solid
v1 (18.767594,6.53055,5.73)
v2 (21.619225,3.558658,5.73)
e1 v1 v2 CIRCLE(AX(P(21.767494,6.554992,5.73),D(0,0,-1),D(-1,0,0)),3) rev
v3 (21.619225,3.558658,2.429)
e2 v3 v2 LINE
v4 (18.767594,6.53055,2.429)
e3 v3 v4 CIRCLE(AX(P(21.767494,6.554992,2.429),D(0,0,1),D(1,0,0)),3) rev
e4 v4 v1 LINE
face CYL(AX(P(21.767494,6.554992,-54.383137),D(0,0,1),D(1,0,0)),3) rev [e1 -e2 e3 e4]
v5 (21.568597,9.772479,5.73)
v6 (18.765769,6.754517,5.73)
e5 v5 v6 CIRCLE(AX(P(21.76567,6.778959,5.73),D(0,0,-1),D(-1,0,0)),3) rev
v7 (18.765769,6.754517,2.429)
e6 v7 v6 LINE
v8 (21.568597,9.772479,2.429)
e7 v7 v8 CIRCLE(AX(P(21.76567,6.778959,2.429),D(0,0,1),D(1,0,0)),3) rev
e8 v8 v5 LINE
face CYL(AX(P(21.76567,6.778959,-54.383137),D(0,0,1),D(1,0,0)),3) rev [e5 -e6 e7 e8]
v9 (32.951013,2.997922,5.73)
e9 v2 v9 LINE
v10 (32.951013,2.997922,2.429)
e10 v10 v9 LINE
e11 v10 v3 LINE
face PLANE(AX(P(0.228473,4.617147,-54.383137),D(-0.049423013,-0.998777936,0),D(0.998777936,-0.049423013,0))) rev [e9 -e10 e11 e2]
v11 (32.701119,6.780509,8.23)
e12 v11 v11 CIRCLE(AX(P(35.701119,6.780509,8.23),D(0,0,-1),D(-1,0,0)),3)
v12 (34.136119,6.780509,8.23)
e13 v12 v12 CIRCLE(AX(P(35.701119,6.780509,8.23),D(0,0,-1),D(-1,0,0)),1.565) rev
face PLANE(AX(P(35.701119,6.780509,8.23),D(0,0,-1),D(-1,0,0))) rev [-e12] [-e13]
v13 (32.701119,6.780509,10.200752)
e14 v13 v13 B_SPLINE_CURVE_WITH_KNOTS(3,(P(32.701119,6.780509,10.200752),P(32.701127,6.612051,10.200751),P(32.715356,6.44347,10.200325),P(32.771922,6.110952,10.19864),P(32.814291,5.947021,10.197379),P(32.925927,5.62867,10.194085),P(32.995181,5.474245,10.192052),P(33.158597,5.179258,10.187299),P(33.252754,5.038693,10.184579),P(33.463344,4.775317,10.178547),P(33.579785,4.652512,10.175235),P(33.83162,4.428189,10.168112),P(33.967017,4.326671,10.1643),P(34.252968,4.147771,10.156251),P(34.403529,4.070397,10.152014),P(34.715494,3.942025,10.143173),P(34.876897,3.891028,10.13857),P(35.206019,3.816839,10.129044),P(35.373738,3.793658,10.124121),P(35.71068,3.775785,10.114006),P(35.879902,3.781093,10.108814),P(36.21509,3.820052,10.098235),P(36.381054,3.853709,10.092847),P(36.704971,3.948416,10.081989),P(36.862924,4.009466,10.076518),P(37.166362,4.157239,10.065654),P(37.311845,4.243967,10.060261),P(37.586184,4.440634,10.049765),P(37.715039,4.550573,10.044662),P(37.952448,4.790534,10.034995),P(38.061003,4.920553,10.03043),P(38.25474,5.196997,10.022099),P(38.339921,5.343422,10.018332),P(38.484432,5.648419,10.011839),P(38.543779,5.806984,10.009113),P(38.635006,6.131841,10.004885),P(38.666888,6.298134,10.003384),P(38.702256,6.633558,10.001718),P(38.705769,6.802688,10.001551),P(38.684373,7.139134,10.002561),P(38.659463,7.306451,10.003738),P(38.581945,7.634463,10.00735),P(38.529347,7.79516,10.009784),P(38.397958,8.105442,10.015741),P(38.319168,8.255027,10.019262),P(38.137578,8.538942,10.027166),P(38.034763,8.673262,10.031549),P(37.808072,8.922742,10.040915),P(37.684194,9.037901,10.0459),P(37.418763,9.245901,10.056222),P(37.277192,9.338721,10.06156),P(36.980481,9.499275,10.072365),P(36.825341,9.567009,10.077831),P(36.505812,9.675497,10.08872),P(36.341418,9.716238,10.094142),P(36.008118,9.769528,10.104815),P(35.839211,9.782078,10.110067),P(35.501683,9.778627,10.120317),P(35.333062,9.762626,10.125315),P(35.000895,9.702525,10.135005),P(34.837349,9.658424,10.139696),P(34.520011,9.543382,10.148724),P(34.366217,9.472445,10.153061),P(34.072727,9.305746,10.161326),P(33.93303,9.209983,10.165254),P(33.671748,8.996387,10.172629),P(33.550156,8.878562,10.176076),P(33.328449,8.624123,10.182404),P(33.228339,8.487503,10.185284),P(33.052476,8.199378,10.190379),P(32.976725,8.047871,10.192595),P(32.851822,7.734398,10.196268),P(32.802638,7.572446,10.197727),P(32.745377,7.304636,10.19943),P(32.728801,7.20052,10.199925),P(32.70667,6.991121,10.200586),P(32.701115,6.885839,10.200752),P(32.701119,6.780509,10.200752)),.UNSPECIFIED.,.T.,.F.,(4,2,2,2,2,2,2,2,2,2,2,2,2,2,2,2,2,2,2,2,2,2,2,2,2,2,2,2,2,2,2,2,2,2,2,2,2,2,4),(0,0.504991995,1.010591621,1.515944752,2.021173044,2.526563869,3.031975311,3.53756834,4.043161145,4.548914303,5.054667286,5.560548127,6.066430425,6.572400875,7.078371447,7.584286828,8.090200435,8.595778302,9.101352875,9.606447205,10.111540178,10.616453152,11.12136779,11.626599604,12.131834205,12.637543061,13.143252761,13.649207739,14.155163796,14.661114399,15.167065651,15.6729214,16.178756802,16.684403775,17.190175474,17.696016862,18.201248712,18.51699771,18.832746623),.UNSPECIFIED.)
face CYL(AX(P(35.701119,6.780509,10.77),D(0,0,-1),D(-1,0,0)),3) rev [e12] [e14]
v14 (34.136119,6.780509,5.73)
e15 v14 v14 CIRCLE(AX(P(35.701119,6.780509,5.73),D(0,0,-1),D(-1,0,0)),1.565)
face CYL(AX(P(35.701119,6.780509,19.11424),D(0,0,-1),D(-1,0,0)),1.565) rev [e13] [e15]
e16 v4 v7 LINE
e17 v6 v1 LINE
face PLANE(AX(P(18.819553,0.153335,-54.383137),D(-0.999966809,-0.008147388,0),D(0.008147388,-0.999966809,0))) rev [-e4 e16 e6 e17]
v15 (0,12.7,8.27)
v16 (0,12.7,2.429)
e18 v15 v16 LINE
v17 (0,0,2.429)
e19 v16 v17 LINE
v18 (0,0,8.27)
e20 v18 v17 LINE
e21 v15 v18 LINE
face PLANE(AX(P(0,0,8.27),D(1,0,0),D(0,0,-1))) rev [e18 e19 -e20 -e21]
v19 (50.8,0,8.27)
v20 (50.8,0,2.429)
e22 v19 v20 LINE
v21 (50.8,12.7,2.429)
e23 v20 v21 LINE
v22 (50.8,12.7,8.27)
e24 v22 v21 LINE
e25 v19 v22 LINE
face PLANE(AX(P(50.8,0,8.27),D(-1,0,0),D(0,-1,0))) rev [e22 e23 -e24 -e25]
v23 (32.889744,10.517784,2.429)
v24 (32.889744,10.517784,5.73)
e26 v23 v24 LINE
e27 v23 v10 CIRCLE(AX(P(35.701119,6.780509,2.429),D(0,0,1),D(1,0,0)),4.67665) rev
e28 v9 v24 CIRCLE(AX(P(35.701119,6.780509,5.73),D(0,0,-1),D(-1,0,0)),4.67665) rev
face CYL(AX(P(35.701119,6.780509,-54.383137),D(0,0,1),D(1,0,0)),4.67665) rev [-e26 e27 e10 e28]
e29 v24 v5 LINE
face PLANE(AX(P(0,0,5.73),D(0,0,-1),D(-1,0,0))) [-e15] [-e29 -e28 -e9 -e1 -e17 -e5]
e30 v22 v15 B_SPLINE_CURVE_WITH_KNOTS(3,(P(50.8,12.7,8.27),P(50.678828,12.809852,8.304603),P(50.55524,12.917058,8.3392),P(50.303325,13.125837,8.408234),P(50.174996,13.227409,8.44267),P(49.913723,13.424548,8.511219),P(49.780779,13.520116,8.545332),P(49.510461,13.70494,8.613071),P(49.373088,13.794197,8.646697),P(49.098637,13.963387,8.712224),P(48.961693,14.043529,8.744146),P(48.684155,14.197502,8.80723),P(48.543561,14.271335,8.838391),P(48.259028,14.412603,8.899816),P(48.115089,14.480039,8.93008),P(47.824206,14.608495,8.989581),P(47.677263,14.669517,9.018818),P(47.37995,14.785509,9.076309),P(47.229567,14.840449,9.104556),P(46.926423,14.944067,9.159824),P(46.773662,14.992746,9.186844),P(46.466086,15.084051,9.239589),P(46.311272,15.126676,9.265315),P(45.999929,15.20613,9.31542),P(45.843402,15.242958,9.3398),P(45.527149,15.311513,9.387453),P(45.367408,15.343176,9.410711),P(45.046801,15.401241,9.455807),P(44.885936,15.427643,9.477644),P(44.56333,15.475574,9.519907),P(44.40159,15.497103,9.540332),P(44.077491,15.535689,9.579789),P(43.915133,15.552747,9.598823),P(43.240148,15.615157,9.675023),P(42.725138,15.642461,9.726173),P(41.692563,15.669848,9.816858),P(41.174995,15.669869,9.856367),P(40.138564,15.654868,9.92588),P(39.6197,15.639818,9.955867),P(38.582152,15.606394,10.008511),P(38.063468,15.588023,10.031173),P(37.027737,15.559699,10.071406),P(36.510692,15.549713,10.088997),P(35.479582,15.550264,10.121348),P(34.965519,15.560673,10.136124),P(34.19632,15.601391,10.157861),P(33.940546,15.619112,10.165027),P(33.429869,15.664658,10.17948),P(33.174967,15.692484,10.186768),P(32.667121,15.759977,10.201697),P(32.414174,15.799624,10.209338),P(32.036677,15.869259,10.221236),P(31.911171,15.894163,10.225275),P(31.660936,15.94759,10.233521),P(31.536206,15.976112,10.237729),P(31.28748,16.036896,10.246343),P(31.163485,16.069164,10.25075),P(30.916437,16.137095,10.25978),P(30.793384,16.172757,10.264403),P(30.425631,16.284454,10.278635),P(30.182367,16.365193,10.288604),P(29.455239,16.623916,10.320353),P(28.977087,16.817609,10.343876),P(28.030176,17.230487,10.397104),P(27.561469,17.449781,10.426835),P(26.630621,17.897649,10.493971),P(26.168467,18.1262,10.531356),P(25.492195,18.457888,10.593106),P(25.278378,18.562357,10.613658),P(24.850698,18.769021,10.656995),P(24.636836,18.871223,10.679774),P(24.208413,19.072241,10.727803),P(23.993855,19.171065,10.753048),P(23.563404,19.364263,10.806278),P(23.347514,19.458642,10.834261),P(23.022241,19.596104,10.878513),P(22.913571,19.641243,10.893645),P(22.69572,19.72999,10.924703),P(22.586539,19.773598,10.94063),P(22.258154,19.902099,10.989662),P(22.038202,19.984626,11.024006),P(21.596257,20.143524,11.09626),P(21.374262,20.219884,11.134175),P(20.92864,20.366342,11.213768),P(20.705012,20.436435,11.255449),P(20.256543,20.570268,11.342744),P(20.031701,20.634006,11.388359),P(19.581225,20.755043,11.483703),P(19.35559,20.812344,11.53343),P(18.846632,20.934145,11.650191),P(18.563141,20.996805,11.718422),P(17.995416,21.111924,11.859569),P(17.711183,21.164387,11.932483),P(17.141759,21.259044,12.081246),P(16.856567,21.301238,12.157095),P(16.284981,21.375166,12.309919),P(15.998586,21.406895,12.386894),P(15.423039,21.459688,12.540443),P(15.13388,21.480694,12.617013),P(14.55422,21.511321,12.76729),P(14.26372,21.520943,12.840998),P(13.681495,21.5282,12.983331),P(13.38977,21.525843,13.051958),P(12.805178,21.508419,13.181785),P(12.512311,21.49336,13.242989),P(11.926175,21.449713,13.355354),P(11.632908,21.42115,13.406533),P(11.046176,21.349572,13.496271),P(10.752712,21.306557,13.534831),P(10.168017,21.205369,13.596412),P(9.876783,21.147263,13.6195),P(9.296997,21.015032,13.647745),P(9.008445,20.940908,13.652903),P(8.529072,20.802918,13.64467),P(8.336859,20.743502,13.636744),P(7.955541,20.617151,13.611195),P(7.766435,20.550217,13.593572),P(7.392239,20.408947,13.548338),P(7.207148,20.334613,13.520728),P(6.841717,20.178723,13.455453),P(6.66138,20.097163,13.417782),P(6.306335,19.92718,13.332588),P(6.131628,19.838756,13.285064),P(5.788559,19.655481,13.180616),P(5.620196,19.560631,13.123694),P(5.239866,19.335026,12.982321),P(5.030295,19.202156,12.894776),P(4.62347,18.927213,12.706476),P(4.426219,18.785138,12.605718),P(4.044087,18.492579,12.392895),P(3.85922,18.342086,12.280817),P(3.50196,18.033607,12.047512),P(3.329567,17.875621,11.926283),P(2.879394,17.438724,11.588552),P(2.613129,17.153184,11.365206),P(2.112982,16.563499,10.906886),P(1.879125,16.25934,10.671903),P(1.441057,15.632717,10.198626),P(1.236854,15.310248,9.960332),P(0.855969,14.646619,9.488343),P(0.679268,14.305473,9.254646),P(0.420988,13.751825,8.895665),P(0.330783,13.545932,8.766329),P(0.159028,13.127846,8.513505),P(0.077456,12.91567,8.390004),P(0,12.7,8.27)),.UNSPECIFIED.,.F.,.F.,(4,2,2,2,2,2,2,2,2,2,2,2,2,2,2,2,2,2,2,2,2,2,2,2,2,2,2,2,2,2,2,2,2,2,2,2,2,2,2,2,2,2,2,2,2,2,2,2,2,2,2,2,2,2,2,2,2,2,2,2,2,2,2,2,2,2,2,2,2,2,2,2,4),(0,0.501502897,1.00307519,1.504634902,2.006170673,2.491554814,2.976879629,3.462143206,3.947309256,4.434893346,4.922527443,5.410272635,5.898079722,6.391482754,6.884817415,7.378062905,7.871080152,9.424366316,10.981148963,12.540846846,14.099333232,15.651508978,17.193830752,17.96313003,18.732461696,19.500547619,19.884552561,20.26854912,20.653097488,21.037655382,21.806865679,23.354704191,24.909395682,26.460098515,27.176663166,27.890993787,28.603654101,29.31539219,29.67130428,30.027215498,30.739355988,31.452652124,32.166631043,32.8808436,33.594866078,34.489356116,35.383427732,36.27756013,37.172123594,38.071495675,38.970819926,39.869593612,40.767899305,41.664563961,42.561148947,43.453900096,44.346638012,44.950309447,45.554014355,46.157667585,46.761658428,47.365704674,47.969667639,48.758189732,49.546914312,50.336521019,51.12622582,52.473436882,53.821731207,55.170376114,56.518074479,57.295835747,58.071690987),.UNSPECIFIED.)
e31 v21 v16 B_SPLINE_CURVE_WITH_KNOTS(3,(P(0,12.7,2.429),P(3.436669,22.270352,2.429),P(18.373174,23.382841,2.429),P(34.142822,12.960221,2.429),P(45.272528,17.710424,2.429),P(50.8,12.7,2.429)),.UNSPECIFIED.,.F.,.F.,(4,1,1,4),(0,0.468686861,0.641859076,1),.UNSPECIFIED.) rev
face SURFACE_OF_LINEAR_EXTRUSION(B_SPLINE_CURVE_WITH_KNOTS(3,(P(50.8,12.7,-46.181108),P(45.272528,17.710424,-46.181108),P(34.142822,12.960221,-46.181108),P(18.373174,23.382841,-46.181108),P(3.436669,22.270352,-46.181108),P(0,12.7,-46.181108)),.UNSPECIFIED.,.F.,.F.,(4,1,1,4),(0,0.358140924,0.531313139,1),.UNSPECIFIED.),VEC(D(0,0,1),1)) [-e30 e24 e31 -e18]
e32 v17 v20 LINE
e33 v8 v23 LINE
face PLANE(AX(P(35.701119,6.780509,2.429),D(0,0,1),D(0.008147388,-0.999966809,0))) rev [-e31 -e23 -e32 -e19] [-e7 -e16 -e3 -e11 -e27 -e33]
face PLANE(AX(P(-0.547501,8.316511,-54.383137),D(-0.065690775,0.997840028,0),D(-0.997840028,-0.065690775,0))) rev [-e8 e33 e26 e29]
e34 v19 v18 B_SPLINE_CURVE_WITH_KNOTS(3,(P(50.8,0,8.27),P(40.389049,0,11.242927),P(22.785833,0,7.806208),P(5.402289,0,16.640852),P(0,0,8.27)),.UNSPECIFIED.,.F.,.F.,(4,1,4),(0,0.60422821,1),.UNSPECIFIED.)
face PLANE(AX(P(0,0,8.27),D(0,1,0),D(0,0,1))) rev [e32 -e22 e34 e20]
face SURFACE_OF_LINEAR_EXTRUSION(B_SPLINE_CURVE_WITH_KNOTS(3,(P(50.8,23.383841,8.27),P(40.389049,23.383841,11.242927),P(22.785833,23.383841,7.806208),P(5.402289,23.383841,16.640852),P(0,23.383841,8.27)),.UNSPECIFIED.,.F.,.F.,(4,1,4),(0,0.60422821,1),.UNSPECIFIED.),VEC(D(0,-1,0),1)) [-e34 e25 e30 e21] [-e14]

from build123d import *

# Parameters (mm, degrees)
SKETCH1_W             = 50.8
SKETCH1_H             = 12.7
BOSS_EXTRUDE1_DEPTH   = 2.54
BOSS_EXTRUDE2_DEPTH   = 2.54
BOSS_EXTRUDE3_START   = -12.6999999
BOSS_EXTRUDE3_DEPTH   = 12.6999999
BOSS_EXTRUDE3_START_2 = 8.27
BOSS_EXTRUDE3_2_DEPTH = 5.379804836
BOSS_EXTRUDE3_START_3 = 12.6999999
BOSS_EXTRUDE3_3_DEPTH = 8.826210912
BOSS_EXTRUDE4_DEPTH   = 3.301
SKETCH8_R             = 1.565
CUT_EXTRUDE2_DEPTH    = 56.73814806
SKETCH9_R             = 3
CUT_EXTRUDE3_DEPTH    = 2.54


with BuildPart() as part:
    # Sketch1 → Boss-Extrude1 (new body)
    with BuildSketch(Plane.XY.offset(5.73)):
        with Locations((25.4, 6.35)):
            Rectangle(SKETCH1_W, SKETCH1_H)
    extrude(amount=BOSS_EXTRUDE1_DEPTH)

    # Sketch2 → Boss-Extrude2 (add)
    with BuildSketch(Plane.XY.offset(8.27)):
        with BuildLine():
            Line((50.8, 12.7), (0, 12.7))
            add(Edge.make_bspline(
                [(50.8, 12.7), (45.272528283, 17.710424363), (34.142821947, 12.960220977), (18.373174323, 23.382841195), (3.436669092, 22.27035247), (0, 12.7)],
                knots=[0, 0, 0, 0, 0.358140924, 0.531313139, 1, 1, 1, 1], degree=3))
        make_face()
    extrude(amount=-BOSS_EXTRUDE2_DEPTH)

    # Boss-Extrude3: read off the stored shape, not the designer's step
    # Boss-Extrude3 outline → Boss-Extrude3 (add)
    with BuildSketch(Plane.XZ.offset(BOSS_EXTRUDE3_START)):
        with BuildLine():
            Line((0, 8.27), (50.8, 8.27))
            add(Edge.make_bspline(
                [(50.8, 8.27), (40.389049097, 11.242926836), (22.785833475, 7.806208143), (5.402288522, 16.640851878), (0, 8.27)],
                knots=[0, 0, 0, 0, 0.60422821, 1, 1, 1, 1], degree=3))
        make_face()
    extrude(amount=BOSS_EXTRUDE3_DEPTH)

    # Boss-Extrude3 2 outline → Boss-Extrude3 2 (add)
    with BuildSketch(Plane.XY.offset(BOSS_EXTRUDE3_START_2)):
        with BuildLine():
            Line((0, 12.7), (50.8, 12.7))
            add(Edge.make_bspline(
                [(50.8, 12.7), (45.272528283, 17.710424363), (34.142821947, 12.960220977), (18.373174323, 23.382841195), (3.436669092, 22.27035247), (0, 12.7)],
                knots=[0, 0, 0, 0, 0.358140924, 0.531313139, 1, 1, 1, 1], degree=3))
        make_face()
    extrude(amount=BOSS_EXTRUDE3_2_DEPTH)

    # Boss-Extrude3 3 outline → Boss-Extrude3 3 (cut)
    with BuildSketch(Plane(origin=(0, 0, 0), x_dir=(1, 0, 0), z_dir=(0, 1, 0)).offset(BOSS_EXTRUDE3_START_3)):
        with BuildLine():
            Line((50.8, -13.649804836), (50.8, -8.27))
            add(Edge.make_bspline(
                [(50.8, -8.27), (40.389049097, -11.242926836), (26.239022787, -8.48038271), (12.230935741, -13.646926994), (8.946408095, -13.649804836)],
                knots=[0, 0, 0, 0, 0.60422821, 0.803831903, 0.803831903, 0.803831903, 0.803831903], degree=3))
            Line((8.946408095, -13.649804836), (50.8, -13.649804836))
        make_face()
        with BuildLine():
            Line((0, -13.649804836), (8.924280918, -13.649804836))
            add(Edge.make_bspline(
                [(8.924280918, -13.649804836), (5.704518452, -13.646980078), (2.671577153, -12.409611674), (0, -8.27)],
                knots=[0.804280192, 0.804280192, 0.804280192, 0.804280192, 1, 1, 1, 1], degree=3))
            Line((0, -8.27), (0, -13.649804836))
        make_face()
    extrude(amount=BOSS_EXTRUDE3_3_DEPTH, mode=Mode.SUBTRACT)

    # Sketch4 → Boss-Extrude4 (add)
    with BuildSketch(Plane.XY.offset(5.73)):
        with BuildLine():
            Line((50.8, 0), (0, 0))
            Line((0, 0), (0, 12.7))
            add(Edge.make_bspline(
                [(0, 12.7), (3.436669092, 22.27035247), (18.373174323, 23.382841195), (34.142821947, 12.960220977), (45.272528283, 17.710424363), (50.8, 12.7)],
                knots=[0, 0, 0, 0, 0.468686861, 0.641859076, 1, 1, 1, 1], degree=3))
            Line((50.8, 12.7), (50.8, 0))
        make_face()
        with BuildLine():
            Line((32.889743891, 10.517784199), (21.568597255, 9.772479468))
            ThreePointArc((21.568597255, 9.772479468), (19.56744695, 8.820482655), (18.765769151, 6.754517218))
            Line((18.765769151, 6.754517218), (18.767593963, 6.53054964))
            ThreePointArc((18.767593963, 6.53054964), (19.602828658, 4.477921208), (21.619225352, 3.558657997))
            Line((21.619225352, 3.558657997), (32.951013165, 2.997921646))
            ThreePointArc((32.951013165, 2.997921646), (40.377614255, 6.818611934), (32.889743891, 10.517784199))
        make_face(mode=Mode.SUBTRACT)
    extrude(amount=-BOSS_EXTRUDE4_DEPTH)

    # Sketch8 → Cut-Extrude2 (cut, through all)
    with BuildSketch(Plane(origin=(0, 0, 5.73), x_dir=(-1, 0, 0), z_dir=(0, 0, -1))):
        with Locations((-35.701119475, 6.780509451)):
            Circle(SKETCH8_R)
    extrude(amount=-CUT_EXTRUDE2_DEPTH, mode=Mode.SUBTRACT)

    # Sketch9 → Cut-Extrude3 (cut)
    with BuildSketch(Plane(origin=(0, 0, 8.23000008), x_dir=(-1, 0, 0), z_dir=(0, 0, -1))):
        with Locations((-35.701119475, 6.780509451)):
            Circle(SKETCH9_R)
    extrude(amount=-CUT_EXTRUDE3_DEPTH, mode=Mode.SUBTRACT)


solid = part.part
